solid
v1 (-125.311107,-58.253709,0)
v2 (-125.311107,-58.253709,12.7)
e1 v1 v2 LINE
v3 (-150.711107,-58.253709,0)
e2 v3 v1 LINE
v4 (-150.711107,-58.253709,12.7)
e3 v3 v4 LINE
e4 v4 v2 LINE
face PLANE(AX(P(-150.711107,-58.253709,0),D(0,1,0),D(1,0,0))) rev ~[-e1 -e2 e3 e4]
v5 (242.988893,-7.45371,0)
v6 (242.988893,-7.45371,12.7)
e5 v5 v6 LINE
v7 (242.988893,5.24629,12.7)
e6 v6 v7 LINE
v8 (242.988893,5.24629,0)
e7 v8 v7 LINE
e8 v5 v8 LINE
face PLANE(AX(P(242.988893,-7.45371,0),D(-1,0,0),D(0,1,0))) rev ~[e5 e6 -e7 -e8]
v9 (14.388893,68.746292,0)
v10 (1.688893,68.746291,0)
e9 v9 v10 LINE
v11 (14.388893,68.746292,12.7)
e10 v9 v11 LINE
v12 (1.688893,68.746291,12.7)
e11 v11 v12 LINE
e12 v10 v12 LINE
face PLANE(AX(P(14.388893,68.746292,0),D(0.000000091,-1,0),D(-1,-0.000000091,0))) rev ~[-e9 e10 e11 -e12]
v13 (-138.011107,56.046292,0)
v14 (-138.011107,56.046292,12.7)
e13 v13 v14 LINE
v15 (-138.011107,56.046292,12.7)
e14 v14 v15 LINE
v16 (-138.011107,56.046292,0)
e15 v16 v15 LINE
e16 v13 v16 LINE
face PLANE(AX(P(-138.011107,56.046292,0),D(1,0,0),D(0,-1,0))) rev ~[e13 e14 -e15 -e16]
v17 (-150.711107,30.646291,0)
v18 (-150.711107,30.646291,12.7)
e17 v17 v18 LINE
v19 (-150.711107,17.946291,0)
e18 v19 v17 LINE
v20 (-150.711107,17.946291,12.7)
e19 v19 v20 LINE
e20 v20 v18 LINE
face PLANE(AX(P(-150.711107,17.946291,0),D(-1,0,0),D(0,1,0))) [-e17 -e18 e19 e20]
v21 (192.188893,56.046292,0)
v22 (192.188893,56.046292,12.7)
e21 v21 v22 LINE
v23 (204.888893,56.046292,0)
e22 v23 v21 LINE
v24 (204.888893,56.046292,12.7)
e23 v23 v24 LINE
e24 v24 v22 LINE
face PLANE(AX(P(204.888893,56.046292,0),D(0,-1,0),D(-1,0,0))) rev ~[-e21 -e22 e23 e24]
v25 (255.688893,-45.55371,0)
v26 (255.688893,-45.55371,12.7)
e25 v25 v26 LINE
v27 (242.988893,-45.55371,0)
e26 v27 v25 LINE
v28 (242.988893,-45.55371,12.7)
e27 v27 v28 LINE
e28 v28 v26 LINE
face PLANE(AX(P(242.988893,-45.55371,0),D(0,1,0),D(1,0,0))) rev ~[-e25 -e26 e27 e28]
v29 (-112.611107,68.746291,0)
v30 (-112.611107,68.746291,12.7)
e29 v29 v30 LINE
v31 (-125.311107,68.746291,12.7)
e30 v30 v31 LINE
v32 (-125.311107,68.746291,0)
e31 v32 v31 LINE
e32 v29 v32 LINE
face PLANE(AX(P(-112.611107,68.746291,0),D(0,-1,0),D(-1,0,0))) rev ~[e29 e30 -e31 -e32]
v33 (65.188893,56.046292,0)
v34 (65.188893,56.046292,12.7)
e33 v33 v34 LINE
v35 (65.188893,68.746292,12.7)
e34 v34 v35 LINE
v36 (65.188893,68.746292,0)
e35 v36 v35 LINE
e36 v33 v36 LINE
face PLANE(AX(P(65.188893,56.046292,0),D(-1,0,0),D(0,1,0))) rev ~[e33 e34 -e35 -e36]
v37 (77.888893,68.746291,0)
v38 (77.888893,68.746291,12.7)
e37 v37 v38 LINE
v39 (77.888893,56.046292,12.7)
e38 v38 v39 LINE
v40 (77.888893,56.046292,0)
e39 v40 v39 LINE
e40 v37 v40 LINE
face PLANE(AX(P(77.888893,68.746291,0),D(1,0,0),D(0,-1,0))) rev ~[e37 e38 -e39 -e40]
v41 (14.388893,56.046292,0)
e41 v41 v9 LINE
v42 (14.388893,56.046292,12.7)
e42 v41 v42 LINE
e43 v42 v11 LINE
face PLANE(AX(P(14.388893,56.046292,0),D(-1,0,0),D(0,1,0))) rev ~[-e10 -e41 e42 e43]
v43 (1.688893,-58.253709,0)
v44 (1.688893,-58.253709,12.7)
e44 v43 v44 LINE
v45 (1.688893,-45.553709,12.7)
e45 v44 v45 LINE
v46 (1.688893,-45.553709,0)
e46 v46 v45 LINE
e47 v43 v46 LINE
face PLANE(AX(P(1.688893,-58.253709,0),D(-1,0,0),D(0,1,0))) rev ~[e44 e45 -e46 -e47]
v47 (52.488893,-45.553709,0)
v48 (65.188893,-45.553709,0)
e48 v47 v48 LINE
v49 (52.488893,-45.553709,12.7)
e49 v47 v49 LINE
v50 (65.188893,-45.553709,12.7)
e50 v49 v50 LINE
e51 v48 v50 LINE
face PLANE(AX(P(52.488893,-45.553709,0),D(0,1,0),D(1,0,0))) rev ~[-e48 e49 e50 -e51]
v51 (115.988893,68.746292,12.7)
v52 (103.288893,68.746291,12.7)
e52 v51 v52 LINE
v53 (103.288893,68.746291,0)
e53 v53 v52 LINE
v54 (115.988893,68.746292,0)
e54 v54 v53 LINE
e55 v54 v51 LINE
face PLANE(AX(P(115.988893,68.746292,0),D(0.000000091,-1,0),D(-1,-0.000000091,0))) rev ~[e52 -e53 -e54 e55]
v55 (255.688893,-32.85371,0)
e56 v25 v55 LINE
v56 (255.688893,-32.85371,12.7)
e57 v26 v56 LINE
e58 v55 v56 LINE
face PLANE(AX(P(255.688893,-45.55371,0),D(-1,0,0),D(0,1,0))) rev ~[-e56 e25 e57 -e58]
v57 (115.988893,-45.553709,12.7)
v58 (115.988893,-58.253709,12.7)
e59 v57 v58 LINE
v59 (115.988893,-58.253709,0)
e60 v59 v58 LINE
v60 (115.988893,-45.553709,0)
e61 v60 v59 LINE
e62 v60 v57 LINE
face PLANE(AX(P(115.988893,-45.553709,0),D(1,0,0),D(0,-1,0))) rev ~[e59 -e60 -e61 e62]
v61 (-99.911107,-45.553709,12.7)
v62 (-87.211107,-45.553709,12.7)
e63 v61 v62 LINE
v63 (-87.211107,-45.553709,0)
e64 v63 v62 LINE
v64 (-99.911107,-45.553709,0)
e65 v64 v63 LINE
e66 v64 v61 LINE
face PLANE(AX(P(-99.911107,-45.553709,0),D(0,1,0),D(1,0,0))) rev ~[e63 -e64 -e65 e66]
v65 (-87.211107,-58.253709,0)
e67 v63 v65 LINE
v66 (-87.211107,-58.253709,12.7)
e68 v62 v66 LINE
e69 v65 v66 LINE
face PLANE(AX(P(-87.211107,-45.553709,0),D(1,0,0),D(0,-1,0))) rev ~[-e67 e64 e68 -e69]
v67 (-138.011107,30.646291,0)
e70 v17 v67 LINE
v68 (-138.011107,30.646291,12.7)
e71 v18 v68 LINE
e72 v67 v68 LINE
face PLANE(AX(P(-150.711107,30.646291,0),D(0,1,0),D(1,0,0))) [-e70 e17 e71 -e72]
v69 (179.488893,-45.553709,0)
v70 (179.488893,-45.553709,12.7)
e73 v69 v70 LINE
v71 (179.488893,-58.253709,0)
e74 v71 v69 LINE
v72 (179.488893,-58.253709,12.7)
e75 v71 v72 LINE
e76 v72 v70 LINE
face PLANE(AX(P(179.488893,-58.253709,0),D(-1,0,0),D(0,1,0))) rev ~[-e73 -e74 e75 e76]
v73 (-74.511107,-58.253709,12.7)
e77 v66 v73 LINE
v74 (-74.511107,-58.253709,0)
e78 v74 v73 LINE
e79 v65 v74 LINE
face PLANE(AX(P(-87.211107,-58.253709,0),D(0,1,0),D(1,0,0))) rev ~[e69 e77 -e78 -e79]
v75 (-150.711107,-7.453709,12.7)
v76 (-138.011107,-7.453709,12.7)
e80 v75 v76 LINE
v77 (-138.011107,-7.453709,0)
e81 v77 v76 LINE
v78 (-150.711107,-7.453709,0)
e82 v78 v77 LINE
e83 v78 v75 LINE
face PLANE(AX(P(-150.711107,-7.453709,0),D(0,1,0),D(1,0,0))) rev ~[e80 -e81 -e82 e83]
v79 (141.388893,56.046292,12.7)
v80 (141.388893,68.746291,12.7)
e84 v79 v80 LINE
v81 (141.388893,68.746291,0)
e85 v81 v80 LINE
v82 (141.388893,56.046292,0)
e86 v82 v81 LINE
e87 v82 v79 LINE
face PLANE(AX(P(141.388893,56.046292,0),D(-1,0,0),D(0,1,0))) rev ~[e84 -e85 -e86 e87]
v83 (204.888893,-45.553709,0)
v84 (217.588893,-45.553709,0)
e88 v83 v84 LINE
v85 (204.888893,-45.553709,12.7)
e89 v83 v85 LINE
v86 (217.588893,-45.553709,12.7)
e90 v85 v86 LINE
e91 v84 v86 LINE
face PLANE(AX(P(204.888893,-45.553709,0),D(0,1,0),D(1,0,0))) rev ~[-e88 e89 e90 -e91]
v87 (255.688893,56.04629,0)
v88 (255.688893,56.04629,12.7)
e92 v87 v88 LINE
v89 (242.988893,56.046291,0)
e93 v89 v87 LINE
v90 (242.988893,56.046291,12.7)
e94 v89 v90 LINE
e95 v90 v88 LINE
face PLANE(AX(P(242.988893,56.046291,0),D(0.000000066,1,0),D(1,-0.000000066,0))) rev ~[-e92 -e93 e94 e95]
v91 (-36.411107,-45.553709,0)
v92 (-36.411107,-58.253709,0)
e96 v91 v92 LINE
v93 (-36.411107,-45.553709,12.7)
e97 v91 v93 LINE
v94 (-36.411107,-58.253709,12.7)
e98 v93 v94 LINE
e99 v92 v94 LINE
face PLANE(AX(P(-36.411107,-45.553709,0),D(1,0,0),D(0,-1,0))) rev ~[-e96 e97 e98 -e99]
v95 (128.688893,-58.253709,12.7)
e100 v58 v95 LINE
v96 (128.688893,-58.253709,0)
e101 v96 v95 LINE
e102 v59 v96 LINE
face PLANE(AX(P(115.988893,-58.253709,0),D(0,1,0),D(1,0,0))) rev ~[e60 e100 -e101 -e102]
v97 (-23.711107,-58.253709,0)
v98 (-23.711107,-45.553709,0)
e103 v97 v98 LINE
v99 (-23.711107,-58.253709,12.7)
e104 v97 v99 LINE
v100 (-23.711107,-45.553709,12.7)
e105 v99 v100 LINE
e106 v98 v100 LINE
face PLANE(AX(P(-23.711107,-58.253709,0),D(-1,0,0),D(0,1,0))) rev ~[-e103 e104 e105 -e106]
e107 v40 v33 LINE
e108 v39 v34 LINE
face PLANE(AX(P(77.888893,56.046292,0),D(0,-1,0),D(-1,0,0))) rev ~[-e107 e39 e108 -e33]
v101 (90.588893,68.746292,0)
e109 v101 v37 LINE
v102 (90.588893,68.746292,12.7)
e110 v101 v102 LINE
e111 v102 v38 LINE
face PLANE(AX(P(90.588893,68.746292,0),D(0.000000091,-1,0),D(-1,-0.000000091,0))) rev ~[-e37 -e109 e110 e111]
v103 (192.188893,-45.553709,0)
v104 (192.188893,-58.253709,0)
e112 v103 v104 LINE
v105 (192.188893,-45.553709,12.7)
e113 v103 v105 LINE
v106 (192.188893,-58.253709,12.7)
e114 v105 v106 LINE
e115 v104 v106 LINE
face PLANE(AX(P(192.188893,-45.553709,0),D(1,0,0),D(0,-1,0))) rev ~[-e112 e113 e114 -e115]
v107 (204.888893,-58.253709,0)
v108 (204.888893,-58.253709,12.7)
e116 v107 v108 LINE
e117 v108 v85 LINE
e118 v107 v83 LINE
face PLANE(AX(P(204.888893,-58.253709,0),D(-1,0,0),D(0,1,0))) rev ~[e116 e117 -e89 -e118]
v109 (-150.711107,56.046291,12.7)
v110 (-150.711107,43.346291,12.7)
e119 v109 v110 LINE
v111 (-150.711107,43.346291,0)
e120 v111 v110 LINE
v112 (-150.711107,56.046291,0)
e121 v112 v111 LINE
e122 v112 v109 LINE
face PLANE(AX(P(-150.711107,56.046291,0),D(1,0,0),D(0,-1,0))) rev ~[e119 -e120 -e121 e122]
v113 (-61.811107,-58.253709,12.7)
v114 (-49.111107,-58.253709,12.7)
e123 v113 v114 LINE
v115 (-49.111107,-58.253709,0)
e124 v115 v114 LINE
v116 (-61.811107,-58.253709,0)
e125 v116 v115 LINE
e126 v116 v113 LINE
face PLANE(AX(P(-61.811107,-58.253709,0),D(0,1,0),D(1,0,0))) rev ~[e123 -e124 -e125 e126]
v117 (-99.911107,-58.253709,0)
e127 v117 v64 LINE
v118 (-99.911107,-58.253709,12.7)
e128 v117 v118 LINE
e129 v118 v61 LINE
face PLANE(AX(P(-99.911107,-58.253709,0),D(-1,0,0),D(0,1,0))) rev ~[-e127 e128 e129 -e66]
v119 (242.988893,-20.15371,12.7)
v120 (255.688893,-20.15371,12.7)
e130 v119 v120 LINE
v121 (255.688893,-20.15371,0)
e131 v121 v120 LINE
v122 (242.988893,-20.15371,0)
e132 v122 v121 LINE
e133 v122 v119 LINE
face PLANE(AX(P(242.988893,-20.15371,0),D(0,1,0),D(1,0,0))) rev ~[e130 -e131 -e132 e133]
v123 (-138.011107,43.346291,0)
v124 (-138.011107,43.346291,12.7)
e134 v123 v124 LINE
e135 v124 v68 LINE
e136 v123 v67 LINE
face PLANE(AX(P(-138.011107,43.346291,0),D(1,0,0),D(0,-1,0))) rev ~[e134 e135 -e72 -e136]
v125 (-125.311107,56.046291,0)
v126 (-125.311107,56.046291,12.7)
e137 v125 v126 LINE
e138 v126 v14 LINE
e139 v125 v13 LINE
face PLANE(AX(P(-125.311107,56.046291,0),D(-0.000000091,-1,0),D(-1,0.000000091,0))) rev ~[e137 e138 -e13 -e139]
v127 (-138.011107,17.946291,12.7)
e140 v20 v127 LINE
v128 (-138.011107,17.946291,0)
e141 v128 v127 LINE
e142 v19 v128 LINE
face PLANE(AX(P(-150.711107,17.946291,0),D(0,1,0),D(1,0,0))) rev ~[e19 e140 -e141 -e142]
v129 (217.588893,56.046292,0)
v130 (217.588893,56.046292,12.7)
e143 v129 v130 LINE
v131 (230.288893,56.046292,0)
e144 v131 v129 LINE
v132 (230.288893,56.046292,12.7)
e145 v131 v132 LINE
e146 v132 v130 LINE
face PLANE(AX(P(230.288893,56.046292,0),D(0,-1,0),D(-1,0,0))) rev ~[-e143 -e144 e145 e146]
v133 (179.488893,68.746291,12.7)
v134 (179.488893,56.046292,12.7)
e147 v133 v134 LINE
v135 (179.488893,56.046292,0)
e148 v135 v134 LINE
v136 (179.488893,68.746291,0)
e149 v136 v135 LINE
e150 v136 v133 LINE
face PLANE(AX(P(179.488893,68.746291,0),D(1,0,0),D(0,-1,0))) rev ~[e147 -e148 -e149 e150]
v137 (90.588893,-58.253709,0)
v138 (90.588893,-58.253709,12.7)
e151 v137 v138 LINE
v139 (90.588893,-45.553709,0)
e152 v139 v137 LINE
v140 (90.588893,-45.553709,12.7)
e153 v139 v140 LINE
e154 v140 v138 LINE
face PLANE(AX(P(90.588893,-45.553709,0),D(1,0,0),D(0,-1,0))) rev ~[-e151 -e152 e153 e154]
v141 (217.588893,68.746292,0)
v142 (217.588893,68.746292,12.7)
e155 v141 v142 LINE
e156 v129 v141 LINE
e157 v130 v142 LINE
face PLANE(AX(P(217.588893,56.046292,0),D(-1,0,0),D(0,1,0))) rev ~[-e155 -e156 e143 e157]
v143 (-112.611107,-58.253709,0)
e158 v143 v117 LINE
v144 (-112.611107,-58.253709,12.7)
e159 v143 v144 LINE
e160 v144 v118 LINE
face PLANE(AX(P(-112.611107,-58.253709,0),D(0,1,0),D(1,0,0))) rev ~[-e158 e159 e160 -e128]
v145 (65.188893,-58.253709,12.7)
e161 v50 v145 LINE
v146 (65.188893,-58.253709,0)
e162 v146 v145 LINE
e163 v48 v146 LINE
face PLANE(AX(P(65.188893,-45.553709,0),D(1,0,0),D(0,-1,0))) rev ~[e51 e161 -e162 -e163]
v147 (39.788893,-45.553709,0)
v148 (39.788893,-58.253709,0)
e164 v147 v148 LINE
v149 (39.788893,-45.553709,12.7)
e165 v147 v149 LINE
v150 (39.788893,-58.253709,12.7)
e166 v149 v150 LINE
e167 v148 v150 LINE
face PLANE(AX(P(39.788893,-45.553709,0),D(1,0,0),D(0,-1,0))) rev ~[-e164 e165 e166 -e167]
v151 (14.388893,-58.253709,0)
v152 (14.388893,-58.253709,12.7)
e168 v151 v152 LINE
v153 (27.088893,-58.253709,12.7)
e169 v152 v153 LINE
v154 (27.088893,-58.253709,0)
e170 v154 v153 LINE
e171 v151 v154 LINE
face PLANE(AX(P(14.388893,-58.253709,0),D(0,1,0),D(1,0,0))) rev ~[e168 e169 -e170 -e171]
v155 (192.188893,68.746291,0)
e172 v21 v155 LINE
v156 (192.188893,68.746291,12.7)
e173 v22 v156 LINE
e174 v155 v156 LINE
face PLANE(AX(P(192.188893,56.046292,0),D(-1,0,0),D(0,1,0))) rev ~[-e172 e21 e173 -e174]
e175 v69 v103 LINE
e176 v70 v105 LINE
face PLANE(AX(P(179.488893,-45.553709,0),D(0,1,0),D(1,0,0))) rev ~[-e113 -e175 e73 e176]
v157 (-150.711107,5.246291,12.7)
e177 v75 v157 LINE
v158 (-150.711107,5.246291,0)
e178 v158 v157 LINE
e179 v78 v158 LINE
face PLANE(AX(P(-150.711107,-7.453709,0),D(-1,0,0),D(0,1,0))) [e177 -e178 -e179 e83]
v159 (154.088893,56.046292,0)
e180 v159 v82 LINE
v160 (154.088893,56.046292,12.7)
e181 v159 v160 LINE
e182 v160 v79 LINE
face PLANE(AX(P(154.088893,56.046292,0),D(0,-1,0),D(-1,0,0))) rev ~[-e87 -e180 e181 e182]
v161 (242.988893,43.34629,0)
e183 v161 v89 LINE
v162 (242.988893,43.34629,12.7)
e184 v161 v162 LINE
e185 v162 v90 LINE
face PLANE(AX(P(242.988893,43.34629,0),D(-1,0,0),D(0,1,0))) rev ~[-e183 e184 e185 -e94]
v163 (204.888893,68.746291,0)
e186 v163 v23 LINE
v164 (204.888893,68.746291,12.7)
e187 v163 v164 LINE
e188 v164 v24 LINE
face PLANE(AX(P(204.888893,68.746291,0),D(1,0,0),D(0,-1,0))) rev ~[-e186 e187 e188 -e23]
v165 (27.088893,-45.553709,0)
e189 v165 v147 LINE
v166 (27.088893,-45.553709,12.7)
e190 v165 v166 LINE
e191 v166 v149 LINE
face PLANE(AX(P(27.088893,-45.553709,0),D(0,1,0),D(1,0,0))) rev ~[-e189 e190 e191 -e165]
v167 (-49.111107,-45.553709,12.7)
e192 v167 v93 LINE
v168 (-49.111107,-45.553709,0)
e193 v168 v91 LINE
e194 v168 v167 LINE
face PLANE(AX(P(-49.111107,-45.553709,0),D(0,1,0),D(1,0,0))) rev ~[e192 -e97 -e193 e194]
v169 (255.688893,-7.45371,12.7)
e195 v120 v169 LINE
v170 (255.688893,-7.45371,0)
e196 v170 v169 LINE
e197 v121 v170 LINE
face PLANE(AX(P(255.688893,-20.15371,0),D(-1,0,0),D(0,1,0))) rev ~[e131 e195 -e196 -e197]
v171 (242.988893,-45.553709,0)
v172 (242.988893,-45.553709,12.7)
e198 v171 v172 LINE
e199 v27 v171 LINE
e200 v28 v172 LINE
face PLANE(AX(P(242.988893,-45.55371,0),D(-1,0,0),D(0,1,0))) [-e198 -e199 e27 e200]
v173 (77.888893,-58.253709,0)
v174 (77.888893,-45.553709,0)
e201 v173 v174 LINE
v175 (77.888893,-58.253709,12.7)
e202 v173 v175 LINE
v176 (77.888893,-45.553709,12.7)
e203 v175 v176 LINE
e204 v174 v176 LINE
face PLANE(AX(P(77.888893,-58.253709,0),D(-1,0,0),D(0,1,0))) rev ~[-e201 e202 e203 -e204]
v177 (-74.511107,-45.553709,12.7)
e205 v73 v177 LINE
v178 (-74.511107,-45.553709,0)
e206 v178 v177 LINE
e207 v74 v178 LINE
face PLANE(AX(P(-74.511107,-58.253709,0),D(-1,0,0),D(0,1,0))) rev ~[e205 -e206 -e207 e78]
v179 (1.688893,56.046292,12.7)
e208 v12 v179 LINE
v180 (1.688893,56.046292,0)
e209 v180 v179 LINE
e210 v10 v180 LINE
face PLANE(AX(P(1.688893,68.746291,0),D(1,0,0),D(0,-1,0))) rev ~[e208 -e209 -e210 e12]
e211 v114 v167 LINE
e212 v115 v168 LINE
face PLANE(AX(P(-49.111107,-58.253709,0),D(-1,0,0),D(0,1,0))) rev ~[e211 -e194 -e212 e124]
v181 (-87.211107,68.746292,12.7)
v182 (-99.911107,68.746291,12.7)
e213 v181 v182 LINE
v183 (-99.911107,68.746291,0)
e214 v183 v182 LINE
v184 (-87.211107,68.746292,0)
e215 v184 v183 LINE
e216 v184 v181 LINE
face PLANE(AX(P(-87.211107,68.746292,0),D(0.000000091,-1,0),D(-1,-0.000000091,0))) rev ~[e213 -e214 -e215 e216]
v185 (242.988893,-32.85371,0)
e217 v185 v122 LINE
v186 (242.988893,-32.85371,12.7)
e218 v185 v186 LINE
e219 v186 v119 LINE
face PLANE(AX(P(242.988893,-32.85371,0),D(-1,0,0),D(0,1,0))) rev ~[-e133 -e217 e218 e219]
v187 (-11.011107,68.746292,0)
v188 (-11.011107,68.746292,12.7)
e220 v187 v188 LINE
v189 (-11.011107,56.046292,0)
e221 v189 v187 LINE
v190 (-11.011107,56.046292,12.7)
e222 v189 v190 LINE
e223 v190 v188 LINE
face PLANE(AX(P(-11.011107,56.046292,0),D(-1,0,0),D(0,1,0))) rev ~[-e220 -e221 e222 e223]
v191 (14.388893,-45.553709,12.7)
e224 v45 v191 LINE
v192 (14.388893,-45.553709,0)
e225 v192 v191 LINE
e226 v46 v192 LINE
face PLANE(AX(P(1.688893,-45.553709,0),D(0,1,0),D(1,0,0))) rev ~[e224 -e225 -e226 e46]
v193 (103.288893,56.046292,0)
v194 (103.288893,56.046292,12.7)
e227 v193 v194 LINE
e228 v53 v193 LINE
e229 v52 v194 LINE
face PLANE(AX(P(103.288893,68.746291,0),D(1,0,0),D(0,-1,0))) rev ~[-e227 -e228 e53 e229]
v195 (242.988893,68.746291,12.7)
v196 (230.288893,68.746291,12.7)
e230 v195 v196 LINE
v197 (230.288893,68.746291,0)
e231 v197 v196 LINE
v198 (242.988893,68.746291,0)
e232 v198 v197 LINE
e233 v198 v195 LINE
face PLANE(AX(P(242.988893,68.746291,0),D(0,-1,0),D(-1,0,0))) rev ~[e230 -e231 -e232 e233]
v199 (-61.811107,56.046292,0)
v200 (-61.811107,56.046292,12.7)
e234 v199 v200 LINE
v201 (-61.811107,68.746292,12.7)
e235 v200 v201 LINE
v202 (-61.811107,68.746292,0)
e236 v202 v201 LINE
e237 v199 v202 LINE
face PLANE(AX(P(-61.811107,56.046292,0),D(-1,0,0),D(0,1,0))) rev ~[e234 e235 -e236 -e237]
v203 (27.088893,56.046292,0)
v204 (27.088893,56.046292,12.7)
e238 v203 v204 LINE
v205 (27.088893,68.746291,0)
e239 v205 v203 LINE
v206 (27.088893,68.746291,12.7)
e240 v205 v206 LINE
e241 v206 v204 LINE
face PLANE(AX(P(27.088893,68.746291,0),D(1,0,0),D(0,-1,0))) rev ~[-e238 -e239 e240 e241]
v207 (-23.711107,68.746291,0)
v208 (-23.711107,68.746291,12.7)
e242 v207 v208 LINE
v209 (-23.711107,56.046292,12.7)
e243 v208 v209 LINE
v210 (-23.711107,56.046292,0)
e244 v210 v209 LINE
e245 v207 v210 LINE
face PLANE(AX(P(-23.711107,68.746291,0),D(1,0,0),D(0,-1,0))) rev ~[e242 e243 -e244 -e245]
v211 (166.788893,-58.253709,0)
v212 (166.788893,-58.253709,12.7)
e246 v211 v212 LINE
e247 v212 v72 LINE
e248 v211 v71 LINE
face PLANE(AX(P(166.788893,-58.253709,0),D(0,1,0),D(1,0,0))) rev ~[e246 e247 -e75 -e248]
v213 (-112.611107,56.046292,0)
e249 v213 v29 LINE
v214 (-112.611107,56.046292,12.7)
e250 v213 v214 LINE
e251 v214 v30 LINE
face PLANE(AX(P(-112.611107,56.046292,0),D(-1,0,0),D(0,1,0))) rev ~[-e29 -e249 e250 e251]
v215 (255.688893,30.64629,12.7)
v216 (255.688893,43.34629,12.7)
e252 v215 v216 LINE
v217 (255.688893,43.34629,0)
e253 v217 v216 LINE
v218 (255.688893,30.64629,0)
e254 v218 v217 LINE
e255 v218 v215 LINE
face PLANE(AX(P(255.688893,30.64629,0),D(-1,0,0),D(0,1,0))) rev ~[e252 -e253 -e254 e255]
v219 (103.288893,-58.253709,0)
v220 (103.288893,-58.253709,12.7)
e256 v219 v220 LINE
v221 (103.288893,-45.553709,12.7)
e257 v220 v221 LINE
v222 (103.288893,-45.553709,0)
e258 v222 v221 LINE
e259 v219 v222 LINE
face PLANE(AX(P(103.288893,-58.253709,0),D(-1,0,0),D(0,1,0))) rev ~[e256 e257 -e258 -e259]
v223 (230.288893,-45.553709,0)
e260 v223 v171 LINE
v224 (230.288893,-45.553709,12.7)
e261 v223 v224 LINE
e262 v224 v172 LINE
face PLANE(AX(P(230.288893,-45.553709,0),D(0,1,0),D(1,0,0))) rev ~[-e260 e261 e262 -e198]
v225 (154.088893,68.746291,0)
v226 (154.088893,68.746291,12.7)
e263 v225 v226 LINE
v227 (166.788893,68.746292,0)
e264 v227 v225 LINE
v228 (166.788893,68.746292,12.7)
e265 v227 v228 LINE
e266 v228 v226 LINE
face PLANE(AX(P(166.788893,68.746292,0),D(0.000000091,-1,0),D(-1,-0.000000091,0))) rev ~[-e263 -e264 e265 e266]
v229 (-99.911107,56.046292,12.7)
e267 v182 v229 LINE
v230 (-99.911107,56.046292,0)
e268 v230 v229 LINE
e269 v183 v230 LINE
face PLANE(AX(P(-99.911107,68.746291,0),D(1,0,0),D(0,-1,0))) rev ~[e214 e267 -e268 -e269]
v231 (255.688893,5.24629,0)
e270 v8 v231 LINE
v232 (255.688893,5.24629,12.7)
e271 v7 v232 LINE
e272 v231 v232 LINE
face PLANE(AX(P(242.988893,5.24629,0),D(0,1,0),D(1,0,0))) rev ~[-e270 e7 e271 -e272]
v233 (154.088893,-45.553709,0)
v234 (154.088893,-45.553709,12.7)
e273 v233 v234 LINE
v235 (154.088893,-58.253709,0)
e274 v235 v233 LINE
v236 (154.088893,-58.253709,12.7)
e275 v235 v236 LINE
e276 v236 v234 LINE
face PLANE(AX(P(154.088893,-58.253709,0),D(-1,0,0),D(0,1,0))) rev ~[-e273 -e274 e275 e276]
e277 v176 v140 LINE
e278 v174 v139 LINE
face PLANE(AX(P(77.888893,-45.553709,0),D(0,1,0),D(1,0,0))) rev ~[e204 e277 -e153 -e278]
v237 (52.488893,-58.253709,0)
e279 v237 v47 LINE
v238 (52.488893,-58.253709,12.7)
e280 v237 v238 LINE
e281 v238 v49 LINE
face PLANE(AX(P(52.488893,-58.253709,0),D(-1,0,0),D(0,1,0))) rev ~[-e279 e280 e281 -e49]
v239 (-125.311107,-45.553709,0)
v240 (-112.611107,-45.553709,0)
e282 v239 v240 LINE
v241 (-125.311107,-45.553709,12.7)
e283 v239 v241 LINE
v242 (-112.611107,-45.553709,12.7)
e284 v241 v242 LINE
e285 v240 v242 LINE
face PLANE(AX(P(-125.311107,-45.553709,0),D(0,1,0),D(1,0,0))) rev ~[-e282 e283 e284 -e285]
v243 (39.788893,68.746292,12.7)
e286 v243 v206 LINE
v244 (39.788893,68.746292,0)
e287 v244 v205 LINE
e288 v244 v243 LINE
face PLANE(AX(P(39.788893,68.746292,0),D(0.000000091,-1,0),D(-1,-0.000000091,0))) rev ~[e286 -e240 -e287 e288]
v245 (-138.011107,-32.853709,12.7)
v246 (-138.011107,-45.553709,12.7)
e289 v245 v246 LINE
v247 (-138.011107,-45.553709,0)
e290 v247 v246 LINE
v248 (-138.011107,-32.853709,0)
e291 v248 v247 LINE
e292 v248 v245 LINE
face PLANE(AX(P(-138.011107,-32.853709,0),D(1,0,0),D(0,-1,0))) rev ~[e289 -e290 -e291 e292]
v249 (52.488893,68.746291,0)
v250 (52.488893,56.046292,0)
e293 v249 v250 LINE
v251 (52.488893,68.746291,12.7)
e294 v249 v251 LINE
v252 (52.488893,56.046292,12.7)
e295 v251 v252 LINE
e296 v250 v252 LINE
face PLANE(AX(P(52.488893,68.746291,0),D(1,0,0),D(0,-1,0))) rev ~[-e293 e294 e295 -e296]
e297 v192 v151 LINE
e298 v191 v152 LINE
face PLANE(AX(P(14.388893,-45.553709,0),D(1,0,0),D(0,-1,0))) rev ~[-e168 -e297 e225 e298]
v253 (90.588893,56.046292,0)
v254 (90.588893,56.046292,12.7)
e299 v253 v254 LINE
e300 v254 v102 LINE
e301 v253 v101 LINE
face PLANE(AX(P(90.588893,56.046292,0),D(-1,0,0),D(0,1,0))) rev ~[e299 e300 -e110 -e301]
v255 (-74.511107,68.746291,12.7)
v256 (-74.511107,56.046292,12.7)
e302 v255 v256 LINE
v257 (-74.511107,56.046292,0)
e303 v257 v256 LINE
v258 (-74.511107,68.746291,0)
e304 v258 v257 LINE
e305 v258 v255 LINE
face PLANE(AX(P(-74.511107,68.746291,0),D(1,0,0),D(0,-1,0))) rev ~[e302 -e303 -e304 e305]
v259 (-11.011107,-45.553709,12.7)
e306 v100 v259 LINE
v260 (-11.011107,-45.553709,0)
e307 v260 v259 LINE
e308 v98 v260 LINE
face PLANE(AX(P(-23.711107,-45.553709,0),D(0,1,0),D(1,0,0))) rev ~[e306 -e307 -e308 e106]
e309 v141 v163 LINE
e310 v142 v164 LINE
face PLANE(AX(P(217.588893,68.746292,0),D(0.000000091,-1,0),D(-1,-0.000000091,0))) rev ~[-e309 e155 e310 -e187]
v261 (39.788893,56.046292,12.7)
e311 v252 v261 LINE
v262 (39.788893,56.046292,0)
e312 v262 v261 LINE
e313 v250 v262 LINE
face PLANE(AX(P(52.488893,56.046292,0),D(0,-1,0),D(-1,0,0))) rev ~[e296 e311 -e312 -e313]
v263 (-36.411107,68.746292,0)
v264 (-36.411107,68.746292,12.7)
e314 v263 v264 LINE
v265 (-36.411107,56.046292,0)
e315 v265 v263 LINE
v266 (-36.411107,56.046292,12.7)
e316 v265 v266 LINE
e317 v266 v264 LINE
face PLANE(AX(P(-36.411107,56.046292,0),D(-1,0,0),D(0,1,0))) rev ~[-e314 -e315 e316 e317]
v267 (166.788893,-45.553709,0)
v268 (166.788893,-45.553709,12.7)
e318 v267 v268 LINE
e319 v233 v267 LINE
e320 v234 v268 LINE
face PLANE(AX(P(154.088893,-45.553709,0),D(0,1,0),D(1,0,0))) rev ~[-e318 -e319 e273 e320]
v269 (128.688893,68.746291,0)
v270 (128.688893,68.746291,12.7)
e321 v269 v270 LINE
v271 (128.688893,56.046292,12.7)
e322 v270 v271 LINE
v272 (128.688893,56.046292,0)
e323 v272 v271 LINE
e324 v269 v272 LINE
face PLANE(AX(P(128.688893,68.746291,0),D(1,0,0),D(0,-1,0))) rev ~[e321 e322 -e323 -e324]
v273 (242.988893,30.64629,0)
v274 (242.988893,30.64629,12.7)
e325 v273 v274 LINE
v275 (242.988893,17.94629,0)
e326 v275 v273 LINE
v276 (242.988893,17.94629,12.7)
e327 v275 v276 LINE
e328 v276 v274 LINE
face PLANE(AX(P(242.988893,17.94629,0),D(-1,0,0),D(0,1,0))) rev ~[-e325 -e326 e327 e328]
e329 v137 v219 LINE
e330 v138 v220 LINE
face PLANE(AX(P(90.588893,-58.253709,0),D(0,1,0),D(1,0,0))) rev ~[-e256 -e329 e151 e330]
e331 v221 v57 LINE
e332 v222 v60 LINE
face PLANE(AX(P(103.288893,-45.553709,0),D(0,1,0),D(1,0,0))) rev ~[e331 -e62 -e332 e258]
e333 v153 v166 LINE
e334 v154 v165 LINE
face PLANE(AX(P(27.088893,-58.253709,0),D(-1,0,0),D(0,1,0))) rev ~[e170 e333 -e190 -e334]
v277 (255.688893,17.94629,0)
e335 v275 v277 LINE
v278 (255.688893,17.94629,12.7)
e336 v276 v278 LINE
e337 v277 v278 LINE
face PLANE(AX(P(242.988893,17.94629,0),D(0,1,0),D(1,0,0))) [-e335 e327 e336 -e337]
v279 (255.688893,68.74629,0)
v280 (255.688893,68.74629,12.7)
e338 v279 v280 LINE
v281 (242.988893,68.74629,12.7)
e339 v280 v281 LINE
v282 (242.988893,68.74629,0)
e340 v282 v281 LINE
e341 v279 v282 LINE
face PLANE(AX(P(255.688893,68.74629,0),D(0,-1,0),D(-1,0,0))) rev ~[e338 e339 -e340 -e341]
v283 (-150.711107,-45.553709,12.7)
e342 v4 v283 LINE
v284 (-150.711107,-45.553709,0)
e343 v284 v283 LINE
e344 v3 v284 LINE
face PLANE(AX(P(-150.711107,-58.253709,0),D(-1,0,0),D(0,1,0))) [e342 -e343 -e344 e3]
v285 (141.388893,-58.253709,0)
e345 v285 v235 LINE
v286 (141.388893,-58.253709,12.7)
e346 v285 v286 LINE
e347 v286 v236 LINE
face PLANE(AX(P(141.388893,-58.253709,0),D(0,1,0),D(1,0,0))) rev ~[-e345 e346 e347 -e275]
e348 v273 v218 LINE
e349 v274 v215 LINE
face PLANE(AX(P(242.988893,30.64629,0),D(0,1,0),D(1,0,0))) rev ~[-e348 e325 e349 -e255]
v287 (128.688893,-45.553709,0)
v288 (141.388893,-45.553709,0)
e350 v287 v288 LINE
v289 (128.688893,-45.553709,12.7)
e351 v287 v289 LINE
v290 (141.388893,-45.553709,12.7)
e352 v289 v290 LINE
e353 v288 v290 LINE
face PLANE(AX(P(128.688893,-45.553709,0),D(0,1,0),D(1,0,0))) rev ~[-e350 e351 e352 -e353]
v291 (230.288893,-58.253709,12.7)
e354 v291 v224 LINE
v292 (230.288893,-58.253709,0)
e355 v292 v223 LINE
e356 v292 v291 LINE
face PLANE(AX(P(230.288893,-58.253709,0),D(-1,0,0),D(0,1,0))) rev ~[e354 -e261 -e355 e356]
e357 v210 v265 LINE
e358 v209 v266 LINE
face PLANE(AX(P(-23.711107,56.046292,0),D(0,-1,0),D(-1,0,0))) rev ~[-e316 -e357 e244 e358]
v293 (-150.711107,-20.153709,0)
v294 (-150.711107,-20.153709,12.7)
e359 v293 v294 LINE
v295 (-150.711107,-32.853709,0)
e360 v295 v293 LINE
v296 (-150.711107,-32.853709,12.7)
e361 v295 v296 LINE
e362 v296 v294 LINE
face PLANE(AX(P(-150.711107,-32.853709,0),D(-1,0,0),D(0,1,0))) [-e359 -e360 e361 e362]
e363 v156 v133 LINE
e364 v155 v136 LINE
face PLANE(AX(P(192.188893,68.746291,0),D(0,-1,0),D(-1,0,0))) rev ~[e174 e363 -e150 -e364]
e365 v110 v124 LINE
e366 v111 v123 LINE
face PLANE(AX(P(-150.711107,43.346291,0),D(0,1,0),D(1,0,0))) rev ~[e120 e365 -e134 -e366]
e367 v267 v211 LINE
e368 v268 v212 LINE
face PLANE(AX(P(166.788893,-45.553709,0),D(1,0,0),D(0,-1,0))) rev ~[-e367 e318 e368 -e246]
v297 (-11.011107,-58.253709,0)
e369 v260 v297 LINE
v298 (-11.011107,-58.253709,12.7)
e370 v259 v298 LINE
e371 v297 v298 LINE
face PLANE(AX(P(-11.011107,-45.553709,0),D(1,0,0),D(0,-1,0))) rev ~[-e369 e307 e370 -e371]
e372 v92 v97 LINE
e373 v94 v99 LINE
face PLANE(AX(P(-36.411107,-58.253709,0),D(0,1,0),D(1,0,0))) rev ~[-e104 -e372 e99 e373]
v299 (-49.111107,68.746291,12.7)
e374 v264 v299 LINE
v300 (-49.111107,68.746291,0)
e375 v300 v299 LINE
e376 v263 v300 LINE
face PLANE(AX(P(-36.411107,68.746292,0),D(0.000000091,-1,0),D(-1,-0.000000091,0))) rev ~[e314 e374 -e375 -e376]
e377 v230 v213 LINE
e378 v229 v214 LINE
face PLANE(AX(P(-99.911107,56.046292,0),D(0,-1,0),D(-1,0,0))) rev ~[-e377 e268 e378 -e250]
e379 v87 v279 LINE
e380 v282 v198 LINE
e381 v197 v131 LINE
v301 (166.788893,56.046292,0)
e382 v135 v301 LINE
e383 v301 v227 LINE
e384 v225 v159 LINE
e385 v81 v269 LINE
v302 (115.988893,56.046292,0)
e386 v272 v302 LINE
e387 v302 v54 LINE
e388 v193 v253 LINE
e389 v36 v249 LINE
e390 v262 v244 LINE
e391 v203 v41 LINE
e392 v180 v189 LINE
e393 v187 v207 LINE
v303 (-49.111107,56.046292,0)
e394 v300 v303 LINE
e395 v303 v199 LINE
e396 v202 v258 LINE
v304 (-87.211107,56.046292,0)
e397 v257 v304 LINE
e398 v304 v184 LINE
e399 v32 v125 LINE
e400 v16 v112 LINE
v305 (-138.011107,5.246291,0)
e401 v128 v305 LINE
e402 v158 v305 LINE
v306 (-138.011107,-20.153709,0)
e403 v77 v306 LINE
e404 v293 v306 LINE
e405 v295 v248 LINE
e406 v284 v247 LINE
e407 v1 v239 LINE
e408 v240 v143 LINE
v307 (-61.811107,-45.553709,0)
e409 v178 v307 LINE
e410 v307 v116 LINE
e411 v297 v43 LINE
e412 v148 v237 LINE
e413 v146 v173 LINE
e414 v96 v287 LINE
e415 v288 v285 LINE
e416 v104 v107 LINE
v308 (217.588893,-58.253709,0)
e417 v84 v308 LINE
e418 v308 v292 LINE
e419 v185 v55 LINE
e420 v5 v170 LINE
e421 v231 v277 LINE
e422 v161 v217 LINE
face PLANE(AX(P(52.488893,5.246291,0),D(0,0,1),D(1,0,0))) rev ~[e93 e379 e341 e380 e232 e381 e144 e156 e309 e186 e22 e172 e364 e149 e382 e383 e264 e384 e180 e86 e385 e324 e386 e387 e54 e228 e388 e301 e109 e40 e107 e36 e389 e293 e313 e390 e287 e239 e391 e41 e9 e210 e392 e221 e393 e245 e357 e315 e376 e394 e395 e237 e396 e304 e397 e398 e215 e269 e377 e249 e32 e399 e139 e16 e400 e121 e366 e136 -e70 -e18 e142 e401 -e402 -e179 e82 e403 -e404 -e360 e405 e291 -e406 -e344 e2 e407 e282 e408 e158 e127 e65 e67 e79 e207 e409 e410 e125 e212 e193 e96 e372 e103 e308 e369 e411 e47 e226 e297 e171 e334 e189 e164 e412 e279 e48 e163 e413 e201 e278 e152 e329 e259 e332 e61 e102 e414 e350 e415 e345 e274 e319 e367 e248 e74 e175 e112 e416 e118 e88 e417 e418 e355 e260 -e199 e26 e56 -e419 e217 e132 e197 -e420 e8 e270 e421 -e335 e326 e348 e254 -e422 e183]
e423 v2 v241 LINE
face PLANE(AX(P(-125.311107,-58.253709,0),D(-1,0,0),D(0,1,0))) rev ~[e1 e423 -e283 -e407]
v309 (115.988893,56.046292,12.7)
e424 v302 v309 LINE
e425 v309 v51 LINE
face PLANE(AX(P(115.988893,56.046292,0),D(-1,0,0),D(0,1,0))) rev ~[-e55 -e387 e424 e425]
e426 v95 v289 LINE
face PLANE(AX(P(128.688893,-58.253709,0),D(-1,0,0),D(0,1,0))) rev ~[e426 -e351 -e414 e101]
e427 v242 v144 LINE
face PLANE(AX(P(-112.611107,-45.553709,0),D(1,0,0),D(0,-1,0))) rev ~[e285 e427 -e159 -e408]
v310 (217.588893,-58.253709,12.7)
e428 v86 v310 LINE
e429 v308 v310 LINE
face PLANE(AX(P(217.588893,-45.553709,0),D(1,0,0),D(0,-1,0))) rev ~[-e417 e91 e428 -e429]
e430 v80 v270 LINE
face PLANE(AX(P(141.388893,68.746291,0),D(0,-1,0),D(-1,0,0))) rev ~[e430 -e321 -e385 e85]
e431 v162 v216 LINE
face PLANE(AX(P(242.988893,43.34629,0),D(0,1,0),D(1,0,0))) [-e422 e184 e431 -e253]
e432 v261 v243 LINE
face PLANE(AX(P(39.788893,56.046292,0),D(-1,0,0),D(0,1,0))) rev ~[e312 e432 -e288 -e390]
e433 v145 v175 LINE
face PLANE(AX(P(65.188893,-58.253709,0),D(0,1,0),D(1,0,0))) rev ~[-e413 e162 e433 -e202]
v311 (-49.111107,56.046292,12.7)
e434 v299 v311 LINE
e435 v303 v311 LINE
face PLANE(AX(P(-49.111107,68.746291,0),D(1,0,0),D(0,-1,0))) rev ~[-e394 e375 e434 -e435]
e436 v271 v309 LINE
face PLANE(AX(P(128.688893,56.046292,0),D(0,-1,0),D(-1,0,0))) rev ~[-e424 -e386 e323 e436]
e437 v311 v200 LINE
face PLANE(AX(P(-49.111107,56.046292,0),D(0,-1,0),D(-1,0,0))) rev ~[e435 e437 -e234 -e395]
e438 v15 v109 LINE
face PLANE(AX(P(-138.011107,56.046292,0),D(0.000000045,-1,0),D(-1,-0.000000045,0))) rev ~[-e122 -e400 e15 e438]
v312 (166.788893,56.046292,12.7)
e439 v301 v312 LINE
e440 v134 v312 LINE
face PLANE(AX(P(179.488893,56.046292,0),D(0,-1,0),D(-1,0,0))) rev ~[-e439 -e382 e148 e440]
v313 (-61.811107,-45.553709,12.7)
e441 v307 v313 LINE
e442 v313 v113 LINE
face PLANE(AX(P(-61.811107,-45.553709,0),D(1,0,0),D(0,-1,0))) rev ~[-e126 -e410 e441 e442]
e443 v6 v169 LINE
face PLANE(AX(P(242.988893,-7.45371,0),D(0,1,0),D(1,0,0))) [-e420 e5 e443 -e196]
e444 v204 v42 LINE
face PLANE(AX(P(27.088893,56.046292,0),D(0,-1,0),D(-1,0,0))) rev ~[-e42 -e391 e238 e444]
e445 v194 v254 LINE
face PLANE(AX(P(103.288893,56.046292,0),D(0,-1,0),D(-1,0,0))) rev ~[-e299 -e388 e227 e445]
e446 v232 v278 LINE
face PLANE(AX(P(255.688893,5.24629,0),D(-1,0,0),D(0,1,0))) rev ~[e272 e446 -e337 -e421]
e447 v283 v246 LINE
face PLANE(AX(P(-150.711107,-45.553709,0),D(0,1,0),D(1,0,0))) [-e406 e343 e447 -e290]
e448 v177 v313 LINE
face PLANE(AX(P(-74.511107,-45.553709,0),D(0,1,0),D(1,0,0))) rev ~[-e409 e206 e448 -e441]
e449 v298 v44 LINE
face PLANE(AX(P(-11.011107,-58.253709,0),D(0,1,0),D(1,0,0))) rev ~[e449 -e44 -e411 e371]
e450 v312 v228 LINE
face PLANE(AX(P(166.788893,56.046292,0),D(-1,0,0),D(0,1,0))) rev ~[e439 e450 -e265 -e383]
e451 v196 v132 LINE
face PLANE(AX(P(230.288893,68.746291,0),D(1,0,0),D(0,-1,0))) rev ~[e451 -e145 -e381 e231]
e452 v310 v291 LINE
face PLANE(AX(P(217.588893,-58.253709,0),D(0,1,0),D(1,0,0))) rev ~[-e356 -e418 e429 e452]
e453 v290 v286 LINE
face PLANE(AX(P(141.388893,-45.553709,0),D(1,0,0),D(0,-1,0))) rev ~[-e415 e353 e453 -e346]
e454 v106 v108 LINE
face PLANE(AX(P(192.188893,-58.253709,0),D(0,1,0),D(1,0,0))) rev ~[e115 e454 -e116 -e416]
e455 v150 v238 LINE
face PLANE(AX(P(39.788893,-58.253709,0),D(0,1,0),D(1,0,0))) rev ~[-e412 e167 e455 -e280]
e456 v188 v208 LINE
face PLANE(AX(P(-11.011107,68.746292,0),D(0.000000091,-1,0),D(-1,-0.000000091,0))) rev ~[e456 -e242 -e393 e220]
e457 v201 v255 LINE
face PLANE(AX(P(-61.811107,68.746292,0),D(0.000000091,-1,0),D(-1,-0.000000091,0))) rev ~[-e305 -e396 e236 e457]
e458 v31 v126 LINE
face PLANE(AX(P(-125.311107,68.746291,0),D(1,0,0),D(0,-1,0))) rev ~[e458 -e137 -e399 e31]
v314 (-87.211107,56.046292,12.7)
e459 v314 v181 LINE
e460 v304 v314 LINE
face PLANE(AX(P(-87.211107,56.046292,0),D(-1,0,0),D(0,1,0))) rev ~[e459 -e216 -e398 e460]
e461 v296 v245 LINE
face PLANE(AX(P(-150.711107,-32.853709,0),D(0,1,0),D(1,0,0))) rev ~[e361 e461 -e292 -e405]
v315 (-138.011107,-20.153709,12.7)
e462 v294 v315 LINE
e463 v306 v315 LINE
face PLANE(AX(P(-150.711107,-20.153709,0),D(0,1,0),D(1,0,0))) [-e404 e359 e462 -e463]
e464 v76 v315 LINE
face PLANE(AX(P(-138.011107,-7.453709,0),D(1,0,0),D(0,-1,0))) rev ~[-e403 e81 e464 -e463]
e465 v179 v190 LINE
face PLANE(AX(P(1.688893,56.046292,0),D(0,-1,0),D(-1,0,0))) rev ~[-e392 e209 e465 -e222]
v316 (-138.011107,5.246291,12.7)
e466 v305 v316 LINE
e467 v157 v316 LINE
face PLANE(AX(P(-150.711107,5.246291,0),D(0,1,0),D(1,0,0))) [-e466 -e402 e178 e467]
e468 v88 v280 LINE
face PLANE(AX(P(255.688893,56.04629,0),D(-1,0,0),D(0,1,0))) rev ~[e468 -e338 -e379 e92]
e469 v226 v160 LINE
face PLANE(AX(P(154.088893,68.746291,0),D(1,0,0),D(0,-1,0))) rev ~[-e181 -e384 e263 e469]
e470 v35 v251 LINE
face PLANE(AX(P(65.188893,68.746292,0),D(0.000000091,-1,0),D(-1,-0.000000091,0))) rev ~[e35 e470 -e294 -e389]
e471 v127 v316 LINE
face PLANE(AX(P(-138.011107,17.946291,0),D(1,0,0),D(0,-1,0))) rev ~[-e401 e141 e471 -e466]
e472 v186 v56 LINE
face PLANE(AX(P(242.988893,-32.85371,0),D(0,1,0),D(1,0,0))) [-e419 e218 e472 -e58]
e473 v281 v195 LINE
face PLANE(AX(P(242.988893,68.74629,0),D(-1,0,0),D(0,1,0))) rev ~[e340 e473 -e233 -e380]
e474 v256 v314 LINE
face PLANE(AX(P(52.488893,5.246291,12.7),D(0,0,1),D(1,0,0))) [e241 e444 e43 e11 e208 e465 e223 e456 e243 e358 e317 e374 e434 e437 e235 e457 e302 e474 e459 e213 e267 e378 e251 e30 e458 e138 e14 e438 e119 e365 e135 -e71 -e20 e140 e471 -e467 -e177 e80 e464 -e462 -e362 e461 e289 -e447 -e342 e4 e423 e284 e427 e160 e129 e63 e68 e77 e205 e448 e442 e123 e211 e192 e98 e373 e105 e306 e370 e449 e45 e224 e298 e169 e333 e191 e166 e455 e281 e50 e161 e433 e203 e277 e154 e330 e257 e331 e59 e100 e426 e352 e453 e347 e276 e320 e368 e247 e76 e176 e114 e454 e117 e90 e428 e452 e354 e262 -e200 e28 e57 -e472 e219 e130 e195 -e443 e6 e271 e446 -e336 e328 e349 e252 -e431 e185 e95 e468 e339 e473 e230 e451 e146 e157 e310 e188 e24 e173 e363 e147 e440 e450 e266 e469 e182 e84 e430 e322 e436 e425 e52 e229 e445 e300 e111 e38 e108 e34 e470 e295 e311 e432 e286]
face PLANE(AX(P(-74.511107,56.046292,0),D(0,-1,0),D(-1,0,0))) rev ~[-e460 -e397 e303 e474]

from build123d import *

# Parameters (mm, degrees)
F0_W     = 12.7
F0_H     = 12.7
F1_DEPTH = 12.7


# Not quite as in the source:
# - ends of sketch curves that miss each other by under 0.0002 mm in the source are joined
# - a feature names something its author has since deleted; it is built from what else it names


with BuildPart() as f1:
    # F0 (on Top) → F1 (new body)
    with BuildSketch(Plane.XY):
        Polygon((-112.6111072004, 68.7462910332), (-125.3111072004, 68.7462910332), (-125.3111072004, 56.0462910332), (-138.0111072004, 56.0462921858), (-138.0111072004, 43.3462910332), (-138.0111072004, 30.6462910332), (-138.0111072004, 17.9462910332), (-138.0111072004, 5.2462910332), (-138.0111072004, -7.4537089668), (-138.0111072004, -20.1537089668), (-138.0111072004, -32.8537089668), (-138.0111072004, -45.5537089668), (-138.0111072004, -58.2537089668), (-125.3111072004, -58.2537089668), (-125.3111072004, -45.5537089668), (-112.6111072004, -45.5537089668), (-112.6111072004, -58.2537089668), (-99.9111072004, -58.2537089668), (-99.9111072004, -45.5537089668), (-87.2111072004, -45.5537089668), (-87.2111072004, -58.2537089668), (-74.5111072004, -58.2537089668), (-74.5111072004, -45.5537089668), (-61.8111072004, -45.5537089668), (-61.8111072004, -58.2537089668), (-49.1111072004, -58.2537089668), (-49.1111072004, -45.5537089668), (-36.4111072004, -45.5537089668), (-36.4111072004, -58.2537089668), (-23.7111072004, -58.2537089668), (-23.7111072004, -45.5537089668), (-11.0111072004, -45.5537089668), (-11.0111072004, -58.2537089668), (1.6888927996, -58.2537089668), (1.6888927996, -45.5537089668), (14.3888927996, -45.5537089668), (14.3888927996, -58.2537089668), (27.0888927996, -58.2537089668), (27.0888927996, -45.5537089668), (39.7888927996, -45.5537089668), (39.7888927996, -58.2537089668), (52.4888927996, -58.2537089668), (52.4888927996, -45.5537089668), (65.1888927996, -45.5537089668), (65.1888927996, -58.2537089668), (77.8888927996, -58.2537089668), (77.8888927996, -45.5537089668), (90.5888927996, -45.5537089668), (90.5888927996, -58.2537089668), (103.2888927996, -58.2537089668), (103.2888927996, -45.5537089668), (115.9888927996, -45.5537089668), (115.9888927996, -58.2537089668), (128.6888927996, -58.2537089668), (128.6888927996, -45.5537089668), (141.3888927996, -45.5537089668), (141.3888927996, -58.2537089668), (154.0888927996, -58.2537089668), (154.0888927996, -45.5537089668), (166.7888927996, -45.5537089668), (166.7888927996, -58.2537089668), (179.4888927996, -58.2537089668), (179.4888927996, -45.5537089668), (192.1888927996, -45.5537089668), (192.1888927996, -58.2537089668), (204.8888927996, -58.2537089668), (204.8888927996, -45.5537089668), (217.5888927996, -45.5537089668), (217.5888927996, -58.2537089668), (230.2888927996, -58.2537089668), (230.2888927996, -45.5537089668), (242.9888927996, -45.5537089668), (242.9888927996, -32.8537103117), (242.9888927996, -20.1537098634), (242.9888927996, -7.4537103117), (242.9888927996, 5.2462896883), (242.9888927996, 17.9462896883), (242.9888927996, 30.6462901366), (242.9888927996, 43.3462896883), (242.9888927996, 56.0462905208), (242.9888927996, 68.7462910332), (230.2888927996, 68.7462910332), (230.2888927996, 56.0462921858), (217.5888927996, 56.0462921858), (217.5888927996, 68.7462921858), (204.8888927996, 68.7462910332), (204.8888927996, 56.0462921858), (192.1888927996, 56.0462921858), (192.1888927996, 68.7462910332), (179.4888927996, 68.7462910332), (179.4888927996, 56.0462921858), (166.7888927996, 56.0462921858), (166.7888927996, 68.7462921858), (154.0888927996, 68.7462910332), (154.0888927996, 56.0462921858), (141.3888927996, 56.0462921858), (141.3888927996, 68.7462910332), (128.6888927996, 68.7462910332), (128.6888927996, 56.0462921858), (115.9888927996, 56.0462921858), (115.9888927996, 68.7462921858), (103.2888927996, 68.7462910332), (103.2888927996, 56.0462921858), (90.5888927996, 56.0462921858), (90.5888927996, 68.7462921858), (77.8888927996, 68.7462910332), (77.8888927996, 56.0462921858), (65.1888927996, 56.0462921858), (65.1888927996, 68.7462921858), (52.4888927996, 68.7462910332), (52.4888927996, 56.0462921858), (39.7888927996, 56.0462921858), (39.7888927996, 68.7462921858), (27.0888927996, 68.7462910332), (27.0888927996, 56.0462921858), (14.3888927996, 56.0462921858), (14.3888927996, 68.7462921858), (1.6888927996, 68.7462910332), (1.6888927996, 56.0462921858), (-11.0111072004, 56.0462921858), (-11.0111072004, 68.7462921858), (-23.7111072004, 68.7462910332), (-23.7111072004, 56.0462921858), (-36.4111072004, 56.0462921858), (-36.4111072004, 68.7462921858), (-49.1111072004, 68.7462910332), (-49.1111072004, 56.0462921858), (-61.8111072004, 56.0462921858), (-61.8111072004, 68.7462921858), (-74.5111072004, 68.7462910332), (-74.5111072004, 56.0462921858), (-87.2111072004, 56.0462921858), (-87.2111072004, 68.7462921858), (-99.9111072004, 68.7462910332), (-99.9111072004, 56.0462921858), (-112.6111072004, 56.0462921858), align=None)
        with Locations((-144.3611072004, -51.9037089668)):
            Rectangle(F0_W, F0_H)
        Polygon((-138.0111072004, 43.3462910332), (-138.0111072004, 56.0462916095), (-150.7111072004, 56.0462910332), (-150.7111072004, 43.3462910332), align=None)
        with Locations((-144.3611072004, 24.2962910332)):
            Rectangle(F0_W, F0_H)
        with Locations((-144.3611072004, -1.1037089668)):
            Rectangle(F0_W, F0_H)
        with Locations((-144.3611072004, -26.5037089668)):
            Rectangle(F0_W, F0_H)
        with Locations((249.3388927996, -39.2037103117)):
            Rectangle(F0_W, F0_H)
        with Locations((249.3388927996, -13.8037103117)):
            Rectangle(F0_W, F0_H)
        with Locations((249.3388927996, 11.5962896883)):
            Rectangle(F0_W, F0_H)
        with Locations((249.3388927996, 36.9962896883)):
            Rectangle(F0_W, F0_H)
        Polygon((255.6888927996, 68.7462896883), (242.9888927996, 68.7462896883), (242.9888927996, 56.0462905208), (255.6888927996, 56.0462896883), align=None)
    extrude(amount=F1_DEPTH)


solid = f1.part
